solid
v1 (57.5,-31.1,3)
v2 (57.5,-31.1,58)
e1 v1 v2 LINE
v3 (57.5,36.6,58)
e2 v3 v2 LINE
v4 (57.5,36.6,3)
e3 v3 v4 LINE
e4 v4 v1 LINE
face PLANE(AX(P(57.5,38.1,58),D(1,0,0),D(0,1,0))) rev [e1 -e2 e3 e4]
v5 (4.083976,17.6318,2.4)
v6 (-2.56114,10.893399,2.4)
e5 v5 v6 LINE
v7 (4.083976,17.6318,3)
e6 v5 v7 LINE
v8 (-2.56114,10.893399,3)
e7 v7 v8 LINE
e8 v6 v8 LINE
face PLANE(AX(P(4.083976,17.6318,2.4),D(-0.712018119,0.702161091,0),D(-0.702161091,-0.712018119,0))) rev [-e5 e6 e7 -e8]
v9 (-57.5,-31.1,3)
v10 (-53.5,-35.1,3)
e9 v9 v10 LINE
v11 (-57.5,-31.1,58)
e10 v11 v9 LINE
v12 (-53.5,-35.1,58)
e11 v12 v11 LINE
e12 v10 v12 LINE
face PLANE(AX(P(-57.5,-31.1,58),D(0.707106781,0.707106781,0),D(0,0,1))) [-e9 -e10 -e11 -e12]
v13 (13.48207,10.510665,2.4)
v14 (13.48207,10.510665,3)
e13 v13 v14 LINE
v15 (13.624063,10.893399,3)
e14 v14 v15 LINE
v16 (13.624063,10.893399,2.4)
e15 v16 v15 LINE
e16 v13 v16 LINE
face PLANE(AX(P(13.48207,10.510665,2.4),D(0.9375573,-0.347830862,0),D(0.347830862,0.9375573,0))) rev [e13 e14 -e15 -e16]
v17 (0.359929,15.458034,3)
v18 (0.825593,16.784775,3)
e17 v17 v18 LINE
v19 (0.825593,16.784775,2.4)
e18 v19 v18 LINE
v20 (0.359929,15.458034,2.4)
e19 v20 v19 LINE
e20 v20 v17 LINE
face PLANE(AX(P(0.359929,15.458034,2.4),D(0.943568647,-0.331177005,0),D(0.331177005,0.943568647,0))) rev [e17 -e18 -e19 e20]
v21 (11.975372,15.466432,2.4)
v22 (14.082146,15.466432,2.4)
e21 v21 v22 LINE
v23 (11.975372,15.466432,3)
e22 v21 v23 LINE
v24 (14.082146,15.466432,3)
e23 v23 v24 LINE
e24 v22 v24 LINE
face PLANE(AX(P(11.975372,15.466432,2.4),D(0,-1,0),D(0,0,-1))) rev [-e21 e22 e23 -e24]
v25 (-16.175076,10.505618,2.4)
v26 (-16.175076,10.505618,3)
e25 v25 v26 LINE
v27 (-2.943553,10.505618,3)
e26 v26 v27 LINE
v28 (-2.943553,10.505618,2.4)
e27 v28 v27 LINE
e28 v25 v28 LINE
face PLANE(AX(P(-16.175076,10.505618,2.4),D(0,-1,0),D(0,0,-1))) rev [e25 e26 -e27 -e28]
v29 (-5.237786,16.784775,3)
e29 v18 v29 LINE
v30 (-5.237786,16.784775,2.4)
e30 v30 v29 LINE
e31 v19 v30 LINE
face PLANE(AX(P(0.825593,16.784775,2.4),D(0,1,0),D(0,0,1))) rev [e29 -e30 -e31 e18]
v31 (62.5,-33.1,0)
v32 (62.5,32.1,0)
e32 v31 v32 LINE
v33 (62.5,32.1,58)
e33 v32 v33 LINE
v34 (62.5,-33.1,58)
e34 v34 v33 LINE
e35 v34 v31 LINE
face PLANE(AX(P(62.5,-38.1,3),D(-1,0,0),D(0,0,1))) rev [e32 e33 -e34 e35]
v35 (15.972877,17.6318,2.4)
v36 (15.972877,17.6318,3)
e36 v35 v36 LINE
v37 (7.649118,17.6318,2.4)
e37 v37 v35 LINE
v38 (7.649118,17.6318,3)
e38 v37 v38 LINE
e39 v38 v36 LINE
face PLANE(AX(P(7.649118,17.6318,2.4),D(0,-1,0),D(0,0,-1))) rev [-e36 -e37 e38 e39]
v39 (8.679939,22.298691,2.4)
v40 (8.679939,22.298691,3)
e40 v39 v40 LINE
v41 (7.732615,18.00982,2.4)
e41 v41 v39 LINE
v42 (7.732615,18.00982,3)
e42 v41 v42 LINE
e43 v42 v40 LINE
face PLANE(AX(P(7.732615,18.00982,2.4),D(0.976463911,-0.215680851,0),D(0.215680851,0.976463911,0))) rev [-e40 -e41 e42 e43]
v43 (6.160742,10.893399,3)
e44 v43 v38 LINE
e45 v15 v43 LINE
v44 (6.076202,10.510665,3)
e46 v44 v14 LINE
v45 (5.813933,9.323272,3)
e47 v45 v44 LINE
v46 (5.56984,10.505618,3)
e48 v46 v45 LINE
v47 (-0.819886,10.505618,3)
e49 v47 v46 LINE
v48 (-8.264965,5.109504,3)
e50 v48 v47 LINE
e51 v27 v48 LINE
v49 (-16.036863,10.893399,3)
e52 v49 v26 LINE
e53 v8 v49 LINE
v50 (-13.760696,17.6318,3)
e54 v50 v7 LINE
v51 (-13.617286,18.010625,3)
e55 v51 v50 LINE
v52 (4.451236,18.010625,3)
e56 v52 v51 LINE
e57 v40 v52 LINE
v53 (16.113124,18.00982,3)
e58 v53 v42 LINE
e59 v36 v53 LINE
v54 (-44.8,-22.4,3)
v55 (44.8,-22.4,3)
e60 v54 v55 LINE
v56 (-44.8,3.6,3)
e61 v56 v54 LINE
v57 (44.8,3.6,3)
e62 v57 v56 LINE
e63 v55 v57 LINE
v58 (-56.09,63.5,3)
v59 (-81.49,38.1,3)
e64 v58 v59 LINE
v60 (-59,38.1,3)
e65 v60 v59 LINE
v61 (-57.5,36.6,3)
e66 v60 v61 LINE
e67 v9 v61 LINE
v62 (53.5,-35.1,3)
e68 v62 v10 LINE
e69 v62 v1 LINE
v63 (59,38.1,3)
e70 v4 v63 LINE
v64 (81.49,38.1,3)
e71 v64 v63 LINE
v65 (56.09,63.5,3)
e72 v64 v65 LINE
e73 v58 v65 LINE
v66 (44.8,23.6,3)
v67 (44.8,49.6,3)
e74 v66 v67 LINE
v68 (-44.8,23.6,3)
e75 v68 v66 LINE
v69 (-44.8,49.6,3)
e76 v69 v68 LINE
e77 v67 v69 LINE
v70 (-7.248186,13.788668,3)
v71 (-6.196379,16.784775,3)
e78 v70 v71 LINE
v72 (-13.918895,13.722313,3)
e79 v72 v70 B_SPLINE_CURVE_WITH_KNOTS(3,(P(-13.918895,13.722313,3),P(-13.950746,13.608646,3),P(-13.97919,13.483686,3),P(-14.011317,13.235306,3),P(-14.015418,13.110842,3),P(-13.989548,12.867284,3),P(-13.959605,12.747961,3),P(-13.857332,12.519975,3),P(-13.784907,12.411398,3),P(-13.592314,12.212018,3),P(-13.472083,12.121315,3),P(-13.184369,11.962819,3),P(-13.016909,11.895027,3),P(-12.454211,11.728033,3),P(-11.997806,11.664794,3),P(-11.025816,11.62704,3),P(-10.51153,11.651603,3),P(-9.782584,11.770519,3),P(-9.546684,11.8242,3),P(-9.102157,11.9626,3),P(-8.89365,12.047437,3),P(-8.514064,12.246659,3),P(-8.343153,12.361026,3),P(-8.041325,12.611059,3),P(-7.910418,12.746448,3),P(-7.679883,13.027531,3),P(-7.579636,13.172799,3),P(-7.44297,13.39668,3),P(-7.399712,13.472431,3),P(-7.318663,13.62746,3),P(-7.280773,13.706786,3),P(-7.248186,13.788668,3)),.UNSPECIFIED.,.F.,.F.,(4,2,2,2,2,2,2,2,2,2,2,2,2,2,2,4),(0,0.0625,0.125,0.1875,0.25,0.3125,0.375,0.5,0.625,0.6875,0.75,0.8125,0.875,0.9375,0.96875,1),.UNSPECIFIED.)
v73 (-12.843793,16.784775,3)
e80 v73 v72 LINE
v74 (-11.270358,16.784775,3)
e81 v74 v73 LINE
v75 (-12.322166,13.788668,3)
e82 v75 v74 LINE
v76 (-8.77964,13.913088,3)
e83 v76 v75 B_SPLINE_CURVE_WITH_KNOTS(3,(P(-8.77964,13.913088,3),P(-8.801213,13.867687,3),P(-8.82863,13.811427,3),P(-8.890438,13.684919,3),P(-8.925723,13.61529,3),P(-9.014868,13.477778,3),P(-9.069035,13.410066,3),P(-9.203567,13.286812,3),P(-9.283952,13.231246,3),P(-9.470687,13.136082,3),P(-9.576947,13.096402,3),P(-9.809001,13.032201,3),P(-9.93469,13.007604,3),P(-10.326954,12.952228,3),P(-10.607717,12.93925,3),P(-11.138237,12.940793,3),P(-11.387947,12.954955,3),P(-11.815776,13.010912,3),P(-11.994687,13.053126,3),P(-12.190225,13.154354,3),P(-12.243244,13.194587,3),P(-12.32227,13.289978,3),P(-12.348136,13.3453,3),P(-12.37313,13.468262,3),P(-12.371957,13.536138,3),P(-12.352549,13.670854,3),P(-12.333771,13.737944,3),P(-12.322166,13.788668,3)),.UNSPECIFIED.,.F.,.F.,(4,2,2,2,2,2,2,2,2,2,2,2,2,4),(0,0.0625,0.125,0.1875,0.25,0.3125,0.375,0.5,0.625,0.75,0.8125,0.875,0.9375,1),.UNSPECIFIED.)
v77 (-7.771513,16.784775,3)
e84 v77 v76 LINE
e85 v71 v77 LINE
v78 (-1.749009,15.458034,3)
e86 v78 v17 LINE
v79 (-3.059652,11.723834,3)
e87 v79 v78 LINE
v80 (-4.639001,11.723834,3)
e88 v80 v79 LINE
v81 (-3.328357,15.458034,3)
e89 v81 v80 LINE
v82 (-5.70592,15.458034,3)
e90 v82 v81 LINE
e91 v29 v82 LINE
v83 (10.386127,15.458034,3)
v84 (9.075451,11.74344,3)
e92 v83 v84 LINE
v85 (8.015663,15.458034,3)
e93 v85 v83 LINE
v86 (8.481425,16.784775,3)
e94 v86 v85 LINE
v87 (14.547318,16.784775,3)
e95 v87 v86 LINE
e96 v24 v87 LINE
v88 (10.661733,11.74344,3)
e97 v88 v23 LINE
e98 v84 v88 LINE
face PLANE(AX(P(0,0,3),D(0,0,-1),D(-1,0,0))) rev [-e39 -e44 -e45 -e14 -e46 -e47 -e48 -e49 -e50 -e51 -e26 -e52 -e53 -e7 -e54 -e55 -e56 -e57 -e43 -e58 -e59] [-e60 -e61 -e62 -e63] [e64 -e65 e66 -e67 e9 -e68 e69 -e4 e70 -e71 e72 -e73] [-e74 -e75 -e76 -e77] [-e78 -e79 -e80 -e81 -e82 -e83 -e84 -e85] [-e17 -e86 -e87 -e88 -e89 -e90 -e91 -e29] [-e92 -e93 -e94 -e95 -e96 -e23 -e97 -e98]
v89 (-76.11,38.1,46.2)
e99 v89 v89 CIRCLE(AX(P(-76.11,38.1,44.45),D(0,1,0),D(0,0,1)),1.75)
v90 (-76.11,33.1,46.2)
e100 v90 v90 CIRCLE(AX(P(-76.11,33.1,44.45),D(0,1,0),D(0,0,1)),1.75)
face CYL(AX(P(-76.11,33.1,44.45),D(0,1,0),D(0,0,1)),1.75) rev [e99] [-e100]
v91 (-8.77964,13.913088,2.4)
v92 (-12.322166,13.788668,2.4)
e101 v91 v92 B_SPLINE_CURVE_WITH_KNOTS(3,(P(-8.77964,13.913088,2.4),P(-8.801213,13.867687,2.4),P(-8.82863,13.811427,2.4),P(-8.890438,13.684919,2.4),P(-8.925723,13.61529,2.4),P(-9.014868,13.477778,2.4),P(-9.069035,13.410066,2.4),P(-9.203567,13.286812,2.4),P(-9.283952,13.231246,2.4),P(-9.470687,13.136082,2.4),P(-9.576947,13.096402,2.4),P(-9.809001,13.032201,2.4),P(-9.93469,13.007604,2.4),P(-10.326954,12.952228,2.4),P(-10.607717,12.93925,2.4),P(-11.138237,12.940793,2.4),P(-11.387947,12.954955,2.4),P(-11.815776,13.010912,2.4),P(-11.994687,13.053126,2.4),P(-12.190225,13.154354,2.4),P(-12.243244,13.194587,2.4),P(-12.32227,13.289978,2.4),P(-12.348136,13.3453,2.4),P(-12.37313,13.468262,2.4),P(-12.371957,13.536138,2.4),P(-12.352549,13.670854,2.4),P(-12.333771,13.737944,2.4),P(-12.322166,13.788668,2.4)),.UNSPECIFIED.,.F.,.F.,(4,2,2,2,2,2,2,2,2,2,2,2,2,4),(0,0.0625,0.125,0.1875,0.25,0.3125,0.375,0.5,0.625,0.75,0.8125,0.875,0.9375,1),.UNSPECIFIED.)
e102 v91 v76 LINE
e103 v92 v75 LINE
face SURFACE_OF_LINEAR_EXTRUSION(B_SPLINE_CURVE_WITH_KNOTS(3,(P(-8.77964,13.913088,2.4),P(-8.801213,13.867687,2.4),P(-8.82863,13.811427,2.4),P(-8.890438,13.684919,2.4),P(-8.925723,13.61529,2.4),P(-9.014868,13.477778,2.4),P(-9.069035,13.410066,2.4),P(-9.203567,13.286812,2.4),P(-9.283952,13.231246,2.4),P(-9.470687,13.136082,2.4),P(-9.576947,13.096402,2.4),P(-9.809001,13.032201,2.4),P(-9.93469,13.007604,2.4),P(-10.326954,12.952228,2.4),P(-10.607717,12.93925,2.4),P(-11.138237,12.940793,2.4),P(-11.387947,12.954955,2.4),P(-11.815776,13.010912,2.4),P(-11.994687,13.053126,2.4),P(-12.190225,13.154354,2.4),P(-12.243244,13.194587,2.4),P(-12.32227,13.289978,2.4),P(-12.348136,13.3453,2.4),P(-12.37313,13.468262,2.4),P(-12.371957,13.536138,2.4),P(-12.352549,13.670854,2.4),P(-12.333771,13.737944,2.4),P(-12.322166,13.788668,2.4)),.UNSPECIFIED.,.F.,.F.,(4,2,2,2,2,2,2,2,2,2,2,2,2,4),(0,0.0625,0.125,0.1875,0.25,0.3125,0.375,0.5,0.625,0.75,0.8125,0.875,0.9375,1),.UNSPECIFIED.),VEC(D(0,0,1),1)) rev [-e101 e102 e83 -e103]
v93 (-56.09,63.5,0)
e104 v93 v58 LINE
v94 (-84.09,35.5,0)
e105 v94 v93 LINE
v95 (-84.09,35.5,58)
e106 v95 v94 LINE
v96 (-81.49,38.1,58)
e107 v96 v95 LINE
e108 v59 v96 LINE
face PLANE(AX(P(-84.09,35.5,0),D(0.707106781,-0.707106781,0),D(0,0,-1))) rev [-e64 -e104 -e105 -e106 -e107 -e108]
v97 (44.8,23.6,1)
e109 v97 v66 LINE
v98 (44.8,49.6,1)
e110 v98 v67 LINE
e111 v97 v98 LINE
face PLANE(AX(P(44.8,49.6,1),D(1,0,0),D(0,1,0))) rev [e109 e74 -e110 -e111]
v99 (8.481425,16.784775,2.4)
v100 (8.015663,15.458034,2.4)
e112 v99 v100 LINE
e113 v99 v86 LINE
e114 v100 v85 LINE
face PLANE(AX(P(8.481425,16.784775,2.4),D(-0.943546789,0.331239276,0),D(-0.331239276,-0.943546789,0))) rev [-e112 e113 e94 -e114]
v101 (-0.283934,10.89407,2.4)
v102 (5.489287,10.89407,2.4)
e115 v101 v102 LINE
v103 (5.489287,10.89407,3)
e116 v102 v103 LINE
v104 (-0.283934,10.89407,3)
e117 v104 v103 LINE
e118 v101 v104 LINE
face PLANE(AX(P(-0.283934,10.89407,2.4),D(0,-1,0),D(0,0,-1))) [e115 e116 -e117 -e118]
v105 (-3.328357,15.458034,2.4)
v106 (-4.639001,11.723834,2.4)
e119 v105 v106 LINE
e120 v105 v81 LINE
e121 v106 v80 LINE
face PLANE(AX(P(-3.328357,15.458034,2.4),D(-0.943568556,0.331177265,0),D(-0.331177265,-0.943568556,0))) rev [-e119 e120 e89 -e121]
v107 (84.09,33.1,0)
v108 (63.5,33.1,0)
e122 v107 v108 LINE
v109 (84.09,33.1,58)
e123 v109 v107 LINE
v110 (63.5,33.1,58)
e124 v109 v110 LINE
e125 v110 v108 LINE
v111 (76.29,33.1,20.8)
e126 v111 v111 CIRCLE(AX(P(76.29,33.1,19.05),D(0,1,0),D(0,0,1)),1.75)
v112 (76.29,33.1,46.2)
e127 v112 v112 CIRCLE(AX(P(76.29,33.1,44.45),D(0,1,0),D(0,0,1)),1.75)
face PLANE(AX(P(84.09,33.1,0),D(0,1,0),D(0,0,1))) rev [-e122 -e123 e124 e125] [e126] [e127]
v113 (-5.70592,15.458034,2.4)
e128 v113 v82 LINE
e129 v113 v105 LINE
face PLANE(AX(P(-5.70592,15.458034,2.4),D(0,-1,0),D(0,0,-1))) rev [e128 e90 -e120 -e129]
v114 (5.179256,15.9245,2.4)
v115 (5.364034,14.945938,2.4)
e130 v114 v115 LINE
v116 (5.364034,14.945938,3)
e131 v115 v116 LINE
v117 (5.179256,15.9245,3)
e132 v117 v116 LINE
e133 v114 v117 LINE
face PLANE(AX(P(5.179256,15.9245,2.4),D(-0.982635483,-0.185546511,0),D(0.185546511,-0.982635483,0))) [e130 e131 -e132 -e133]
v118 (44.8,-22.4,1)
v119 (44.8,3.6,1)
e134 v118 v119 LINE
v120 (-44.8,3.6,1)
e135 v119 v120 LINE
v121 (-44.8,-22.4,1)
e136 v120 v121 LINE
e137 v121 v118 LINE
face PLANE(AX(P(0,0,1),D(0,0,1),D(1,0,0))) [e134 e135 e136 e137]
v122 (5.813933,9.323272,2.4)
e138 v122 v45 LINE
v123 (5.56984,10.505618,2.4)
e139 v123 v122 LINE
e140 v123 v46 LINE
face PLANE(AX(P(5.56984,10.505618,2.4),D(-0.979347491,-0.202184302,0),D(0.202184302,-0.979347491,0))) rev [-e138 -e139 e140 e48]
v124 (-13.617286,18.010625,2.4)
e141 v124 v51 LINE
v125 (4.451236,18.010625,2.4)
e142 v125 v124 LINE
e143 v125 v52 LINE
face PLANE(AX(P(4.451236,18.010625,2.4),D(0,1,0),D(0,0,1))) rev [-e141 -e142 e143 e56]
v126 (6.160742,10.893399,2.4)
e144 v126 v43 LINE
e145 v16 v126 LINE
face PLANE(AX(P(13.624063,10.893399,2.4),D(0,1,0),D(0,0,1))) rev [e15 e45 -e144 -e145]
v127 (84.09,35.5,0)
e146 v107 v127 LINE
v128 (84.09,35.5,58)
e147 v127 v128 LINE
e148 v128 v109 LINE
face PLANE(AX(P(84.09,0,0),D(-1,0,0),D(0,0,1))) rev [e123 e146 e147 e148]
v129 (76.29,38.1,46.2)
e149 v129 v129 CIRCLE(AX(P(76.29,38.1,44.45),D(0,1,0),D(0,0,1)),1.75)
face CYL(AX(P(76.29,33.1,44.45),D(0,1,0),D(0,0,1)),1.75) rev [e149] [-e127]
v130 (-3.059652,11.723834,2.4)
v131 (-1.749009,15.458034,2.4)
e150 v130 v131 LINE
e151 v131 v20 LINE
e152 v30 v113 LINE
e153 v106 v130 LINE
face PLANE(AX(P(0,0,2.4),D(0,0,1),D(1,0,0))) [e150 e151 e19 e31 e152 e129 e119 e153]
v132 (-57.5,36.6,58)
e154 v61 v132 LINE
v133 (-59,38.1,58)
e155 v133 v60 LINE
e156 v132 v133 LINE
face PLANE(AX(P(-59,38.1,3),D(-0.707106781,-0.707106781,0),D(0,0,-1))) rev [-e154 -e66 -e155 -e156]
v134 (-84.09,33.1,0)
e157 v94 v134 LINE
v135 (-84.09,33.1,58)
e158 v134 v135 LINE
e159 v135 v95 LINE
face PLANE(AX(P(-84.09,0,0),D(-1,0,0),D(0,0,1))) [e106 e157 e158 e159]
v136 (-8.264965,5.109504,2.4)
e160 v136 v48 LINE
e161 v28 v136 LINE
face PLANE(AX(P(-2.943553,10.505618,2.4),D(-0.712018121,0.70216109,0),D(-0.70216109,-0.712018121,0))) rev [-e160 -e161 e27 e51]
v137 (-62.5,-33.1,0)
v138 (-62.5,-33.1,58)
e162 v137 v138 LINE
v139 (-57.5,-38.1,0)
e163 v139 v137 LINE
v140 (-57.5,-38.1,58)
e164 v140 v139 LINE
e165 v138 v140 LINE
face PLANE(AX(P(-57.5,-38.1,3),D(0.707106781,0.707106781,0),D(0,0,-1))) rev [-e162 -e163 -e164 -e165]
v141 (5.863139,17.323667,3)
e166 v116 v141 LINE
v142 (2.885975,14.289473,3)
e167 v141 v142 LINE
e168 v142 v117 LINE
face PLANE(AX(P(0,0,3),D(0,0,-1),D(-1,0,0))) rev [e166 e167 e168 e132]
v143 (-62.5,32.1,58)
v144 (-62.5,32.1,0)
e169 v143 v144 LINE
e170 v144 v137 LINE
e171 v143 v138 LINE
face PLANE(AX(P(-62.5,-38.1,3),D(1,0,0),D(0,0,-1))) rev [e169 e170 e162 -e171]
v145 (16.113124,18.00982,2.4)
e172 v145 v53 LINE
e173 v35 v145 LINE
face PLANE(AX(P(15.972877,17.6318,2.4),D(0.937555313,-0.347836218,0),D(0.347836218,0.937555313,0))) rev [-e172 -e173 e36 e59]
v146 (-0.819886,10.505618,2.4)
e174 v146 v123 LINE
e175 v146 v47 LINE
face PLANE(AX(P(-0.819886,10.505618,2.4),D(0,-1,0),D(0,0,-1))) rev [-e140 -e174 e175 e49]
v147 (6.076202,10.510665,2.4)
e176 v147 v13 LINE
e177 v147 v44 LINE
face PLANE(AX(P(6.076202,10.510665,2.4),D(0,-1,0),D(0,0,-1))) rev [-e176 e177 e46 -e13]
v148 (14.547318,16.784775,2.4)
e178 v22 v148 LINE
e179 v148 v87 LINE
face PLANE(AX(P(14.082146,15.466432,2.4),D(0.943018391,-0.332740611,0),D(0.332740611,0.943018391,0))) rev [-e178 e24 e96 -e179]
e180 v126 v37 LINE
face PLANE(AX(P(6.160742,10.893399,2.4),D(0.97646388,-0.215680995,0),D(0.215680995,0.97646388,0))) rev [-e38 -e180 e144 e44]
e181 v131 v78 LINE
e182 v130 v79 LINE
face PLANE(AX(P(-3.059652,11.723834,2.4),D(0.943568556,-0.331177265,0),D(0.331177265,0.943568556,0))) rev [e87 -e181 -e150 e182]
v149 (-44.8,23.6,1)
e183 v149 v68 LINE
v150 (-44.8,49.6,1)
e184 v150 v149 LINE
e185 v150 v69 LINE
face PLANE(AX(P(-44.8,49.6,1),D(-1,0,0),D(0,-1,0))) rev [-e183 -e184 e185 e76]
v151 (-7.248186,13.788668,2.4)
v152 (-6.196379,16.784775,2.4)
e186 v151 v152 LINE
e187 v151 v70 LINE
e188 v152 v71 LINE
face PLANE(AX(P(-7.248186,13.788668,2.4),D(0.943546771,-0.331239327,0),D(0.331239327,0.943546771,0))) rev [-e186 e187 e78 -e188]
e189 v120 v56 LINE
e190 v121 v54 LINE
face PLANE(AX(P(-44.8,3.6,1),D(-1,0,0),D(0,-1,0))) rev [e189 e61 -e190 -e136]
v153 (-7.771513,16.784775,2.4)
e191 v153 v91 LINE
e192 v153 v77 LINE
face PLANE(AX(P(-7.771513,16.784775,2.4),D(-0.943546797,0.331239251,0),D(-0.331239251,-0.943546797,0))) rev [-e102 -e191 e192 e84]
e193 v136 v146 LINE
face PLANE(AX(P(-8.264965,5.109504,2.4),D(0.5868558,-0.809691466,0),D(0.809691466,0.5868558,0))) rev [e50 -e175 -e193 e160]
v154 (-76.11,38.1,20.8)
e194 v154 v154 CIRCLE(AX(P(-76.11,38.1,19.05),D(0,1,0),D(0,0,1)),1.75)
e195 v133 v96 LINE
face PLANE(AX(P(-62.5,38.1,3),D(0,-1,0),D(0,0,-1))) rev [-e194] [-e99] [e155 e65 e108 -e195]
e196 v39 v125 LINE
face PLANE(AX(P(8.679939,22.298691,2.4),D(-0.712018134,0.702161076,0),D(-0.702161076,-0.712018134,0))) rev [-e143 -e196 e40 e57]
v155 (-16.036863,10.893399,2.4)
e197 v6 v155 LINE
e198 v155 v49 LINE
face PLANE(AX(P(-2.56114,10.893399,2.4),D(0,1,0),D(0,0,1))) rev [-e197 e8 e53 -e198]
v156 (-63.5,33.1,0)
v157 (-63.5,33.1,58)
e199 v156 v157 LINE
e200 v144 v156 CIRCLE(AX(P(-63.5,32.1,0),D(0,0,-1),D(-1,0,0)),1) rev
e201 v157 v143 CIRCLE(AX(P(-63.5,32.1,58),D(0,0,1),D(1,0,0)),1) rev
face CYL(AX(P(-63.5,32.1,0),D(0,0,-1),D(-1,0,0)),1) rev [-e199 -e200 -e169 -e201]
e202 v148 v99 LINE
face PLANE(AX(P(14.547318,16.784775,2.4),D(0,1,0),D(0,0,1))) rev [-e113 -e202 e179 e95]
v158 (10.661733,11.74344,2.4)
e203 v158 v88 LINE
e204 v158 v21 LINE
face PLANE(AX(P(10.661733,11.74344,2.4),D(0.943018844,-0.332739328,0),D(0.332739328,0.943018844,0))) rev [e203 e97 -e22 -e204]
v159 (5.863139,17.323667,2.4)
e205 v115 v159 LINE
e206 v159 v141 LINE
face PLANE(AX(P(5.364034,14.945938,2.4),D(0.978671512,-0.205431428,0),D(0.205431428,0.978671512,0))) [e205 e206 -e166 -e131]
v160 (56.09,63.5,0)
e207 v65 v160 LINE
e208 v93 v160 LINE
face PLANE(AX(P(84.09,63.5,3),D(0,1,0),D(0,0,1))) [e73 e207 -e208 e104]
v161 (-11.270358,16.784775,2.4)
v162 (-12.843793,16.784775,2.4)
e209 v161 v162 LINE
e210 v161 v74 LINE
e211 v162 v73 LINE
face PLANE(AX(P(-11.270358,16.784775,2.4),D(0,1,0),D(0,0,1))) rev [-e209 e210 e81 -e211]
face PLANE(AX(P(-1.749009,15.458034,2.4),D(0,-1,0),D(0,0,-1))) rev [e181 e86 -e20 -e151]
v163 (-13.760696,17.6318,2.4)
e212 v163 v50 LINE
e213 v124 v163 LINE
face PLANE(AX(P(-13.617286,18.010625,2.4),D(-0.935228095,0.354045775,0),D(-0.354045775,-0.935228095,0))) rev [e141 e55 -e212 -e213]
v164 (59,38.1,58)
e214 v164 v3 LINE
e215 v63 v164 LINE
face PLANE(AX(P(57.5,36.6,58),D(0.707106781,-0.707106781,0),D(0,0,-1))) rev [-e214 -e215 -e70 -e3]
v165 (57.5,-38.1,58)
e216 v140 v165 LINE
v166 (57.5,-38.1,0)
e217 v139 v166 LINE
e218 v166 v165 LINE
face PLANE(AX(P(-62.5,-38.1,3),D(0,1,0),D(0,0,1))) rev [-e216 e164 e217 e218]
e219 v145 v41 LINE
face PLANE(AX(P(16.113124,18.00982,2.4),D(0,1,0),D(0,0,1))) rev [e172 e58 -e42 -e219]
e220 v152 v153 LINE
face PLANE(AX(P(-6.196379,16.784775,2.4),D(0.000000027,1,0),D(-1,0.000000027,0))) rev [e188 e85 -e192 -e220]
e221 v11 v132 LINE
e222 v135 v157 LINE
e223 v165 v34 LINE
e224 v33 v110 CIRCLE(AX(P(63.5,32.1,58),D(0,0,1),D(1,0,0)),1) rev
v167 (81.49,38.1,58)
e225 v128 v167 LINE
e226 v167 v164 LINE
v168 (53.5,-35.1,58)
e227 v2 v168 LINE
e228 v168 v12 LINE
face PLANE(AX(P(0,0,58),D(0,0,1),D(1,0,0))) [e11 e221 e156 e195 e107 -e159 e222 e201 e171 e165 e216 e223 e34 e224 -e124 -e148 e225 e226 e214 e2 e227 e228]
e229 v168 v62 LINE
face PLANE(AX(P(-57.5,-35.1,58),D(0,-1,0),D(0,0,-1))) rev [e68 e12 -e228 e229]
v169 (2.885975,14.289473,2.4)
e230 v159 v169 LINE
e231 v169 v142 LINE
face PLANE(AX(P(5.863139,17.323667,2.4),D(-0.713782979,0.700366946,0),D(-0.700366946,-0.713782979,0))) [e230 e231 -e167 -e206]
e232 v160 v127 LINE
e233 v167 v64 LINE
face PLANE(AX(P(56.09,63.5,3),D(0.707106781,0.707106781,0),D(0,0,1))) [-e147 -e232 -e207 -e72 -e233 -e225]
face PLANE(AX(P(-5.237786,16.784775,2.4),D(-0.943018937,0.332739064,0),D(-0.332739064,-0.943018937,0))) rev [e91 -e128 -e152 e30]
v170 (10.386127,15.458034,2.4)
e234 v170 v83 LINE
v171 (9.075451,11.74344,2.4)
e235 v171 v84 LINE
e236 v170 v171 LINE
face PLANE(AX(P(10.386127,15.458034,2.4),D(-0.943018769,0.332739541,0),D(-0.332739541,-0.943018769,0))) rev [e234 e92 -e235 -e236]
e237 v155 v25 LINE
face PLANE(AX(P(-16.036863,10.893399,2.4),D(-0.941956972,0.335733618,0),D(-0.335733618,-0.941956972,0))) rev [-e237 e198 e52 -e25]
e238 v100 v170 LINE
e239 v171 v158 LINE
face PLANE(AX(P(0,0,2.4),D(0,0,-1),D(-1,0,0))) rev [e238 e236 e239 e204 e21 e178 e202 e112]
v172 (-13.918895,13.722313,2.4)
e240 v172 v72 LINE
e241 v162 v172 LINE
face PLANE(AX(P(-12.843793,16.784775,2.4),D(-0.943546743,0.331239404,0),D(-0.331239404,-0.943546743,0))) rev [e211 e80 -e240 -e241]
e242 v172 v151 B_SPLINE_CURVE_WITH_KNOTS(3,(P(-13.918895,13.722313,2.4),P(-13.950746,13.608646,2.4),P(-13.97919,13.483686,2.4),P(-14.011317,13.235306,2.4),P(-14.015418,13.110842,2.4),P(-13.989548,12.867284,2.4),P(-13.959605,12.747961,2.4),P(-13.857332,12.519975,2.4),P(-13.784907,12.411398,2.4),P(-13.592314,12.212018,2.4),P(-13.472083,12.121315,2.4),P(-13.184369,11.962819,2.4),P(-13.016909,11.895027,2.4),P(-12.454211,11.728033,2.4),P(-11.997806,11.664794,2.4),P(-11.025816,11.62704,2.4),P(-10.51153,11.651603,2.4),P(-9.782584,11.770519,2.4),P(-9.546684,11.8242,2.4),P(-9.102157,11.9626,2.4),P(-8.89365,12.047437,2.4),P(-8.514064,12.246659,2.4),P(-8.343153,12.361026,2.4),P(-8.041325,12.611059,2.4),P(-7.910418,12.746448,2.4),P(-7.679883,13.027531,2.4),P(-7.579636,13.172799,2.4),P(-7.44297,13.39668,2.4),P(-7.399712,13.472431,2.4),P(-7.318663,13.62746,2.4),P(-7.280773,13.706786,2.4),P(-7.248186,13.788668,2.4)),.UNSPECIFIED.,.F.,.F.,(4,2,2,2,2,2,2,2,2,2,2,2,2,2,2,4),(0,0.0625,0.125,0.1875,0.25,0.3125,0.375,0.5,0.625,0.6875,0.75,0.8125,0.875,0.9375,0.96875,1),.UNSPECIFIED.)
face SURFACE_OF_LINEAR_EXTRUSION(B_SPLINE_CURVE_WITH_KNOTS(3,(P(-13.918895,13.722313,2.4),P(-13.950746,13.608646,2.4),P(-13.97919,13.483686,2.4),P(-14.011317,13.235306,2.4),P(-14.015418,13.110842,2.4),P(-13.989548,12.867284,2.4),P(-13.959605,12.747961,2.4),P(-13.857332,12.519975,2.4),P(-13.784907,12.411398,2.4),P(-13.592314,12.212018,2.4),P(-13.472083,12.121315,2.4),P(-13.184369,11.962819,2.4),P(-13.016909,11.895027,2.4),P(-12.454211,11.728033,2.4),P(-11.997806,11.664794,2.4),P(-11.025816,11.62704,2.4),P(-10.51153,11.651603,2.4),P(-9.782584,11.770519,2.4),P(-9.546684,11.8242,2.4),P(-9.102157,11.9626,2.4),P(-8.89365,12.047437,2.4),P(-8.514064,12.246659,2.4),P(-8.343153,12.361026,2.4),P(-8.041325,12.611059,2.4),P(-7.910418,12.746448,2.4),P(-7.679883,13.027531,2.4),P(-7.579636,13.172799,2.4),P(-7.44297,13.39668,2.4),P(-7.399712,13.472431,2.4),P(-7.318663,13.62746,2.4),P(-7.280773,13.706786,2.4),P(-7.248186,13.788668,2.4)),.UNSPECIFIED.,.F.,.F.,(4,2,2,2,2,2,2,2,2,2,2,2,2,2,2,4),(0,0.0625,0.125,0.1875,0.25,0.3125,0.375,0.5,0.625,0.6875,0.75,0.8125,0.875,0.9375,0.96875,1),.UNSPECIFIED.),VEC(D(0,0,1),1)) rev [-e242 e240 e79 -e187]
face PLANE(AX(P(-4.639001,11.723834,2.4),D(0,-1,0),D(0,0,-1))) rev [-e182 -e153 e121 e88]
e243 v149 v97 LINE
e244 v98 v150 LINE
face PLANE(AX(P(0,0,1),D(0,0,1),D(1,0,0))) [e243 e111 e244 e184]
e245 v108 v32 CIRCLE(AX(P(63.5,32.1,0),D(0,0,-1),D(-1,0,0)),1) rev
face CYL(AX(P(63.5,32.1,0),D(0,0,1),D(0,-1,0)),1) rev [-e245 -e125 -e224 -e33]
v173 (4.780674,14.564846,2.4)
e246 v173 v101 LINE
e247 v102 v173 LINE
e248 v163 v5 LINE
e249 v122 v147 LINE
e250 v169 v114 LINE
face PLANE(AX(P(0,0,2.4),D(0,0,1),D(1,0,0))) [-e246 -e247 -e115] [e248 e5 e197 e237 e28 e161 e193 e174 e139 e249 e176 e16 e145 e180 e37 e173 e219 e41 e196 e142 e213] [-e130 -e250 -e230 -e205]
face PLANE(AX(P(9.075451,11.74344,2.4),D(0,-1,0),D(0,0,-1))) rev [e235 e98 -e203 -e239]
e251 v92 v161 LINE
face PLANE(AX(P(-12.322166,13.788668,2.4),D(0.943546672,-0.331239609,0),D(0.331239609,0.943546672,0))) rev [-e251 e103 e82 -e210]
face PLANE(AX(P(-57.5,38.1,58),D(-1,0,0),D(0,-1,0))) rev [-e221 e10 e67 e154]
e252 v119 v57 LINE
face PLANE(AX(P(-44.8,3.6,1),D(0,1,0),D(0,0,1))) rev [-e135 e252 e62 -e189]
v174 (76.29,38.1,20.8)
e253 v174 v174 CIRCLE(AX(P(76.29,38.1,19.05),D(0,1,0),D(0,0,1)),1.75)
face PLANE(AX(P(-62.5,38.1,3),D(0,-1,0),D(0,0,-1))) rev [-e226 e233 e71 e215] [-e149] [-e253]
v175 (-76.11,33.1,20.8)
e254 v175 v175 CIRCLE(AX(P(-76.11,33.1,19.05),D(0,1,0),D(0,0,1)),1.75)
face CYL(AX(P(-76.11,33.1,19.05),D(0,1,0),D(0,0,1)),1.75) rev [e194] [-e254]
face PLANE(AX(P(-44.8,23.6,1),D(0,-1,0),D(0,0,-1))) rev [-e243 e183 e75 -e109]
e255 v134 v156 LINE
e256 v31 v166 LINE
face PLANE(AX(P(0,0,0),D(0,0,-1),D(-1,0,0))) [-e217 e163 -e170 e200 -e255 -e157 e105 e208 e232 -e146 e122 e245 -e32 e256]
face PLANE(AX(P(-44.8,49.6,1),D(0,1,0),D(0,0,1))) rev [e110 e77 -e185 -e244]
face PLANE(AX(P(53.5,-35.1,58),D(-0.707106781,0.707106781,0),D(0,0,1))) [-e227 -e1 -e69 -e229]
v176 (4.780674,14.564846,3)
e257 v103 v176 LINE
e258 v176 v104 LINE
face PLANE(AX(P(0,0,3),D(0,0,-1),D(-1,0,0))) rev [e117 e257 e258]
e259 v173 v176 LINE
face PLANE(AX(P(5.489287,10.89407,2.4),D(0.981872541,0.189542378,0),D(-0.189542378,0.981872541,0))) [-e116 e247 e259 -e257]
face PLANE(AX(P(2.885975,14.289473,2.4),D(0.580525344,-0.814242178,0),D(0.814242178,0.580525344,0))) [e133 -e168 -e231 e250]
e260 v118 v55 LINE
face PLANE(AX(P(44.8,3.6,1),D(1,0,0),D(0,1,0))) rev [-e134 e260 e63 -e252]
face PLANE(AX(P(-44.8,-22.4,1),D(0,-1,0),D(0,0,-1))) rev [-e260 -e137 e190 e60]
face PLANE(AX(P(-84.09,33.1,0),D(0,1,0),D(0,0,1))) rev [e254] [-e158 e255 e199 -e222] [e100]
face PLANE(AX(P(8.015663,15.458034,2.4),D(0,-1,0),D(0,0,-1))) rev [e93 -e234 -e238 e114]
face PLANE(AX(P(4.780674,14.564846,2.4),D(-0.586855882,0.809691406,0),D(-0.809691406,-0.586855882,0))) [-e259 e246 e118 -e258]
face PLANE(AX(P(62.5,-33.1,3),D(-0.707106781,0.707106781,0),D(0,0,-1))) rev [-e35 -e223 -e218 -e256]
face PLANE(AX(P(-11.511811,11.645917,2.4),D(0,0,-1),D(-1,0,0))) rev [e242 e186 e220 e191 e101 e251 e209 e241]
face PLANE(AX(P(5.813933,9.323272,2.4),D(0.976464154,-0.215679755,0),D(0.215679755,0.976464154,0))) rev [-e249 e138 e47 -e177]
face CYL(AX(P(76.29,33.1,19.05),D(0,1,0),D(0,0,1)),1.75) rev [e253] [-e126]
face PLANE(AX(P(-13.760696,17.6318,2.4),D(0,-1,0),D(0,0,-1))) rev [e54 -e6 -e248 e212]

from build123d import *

# Parameters (mm, degrees)
SKETCH1_W           = 125
SKETCH1_H           = 76.2
BOSS_EXTRUDE1_DEPTH = 3
SKETCH2_W           = 5
SKETCH2_H           = 76.2
BOSS_EXTRUDE2_DEPTH = 55
SKETCH4_W           = 58
SKETCH4_H           = 5
BOSS_EXTRUDE4_DEPTH = 21.59
SKETCH5_W           = 58
SKETCH5_H           = 5
BOSS_EXTRUDE5_DEPTH = 21.59
SKETCH6_W           = 168.18
SKETCH6_H           = 25.4
BOSS_EXTRUDE6_DEPTH = 3
CHAMFER1_SIZE       = 28
SKETCH7_W           = 89.6
SKETCH7_H           = 26
CUT_EXTRUDE1_DEPTH  = 2
SKETCH9_W           = 115
SKETCH9_H           = 3
BOSS_EXTRUDE7_DEPTH = 55
CHAMFER2_SIZE       = 4
CHAMFER3_SIZE       = 5
CUT_EXTRUDE2_START  = -0.6
CUT_EXTRUDE2_DEPTH  = 0.6
SKETCH11_R          = 1.75
CUT_EXTRUDE3_DEPTH  = 5
SKETCH12_R          = 1.75
CUT_EXTRUDE4_DEPTH  = 5
FILLET1_R           = 1
CHAMFER4_SIZE       = 1.5


# Read off the part's stored shape, not the designer's step: Cut-Extrude2
with BuildPart() as part:
    # Sketch1 → Boss-Extrude1 (new body)
    with BuildSketch(Plane.XY):
        Rectangle(SKETCH1_W, SKETCH1_H)
    extrude(amount=BOSS_EXTRUDE1_DEPTH)

    # Sketch2 → Boss-Extrude2 (add)
    with BuildSketch(Plane.XY.offset(3)):
        with Locations((-60, 0)):
            Rectangle(SKETCH2_W, SKETCH2_H)
        with Locations((60, 0)):
            Rectangle(SKETCH2_W, SKETCH2_H)
    extrude(amount=BOSS_EXTRUDE2_DEPTH)

    # Sketch4 → Boss-Extrude4 (add)
    with BuildSketch(Plane.ZY.offset(62.5)):
        with Locations((29, 35.6)):
            Rectangle(SKETCH4_W, SKETCH4_H)
    extrude(amount=BOSS_EXTRUDE4_DEPTH)

    # Sketch5 → Boss-Extrude5 (add)
    with BuildSketch(Plane(origin=(62.5, 0, 0), x_dir=(0, 0, -1), z_dir=(1, 0, 0))):
        with Locations((-29, 35.6)):
            Rectangle(SKETCH5_W, SKETCH5_H)
    extrude(amount=BOSS_EXTRUDE5_DEPTH)

    # Sketch6 → Boss-Extrude6 (add)
    with BuildSketch(Plane(origin=(0, 0, 0), x_dir=(-1, 0, 0), z_dir=(0, 0, -1))):
        with Locations((0, 50.8)):
            Rectangle(SKETCH6_W, SKETCH6_H)
    extrude(amount=-BOSS_EXTRUDE6_DEPTH)

    # Chamfer1
    chamfer1_edges = [part.edges().sort_by_distance(p)[0] for p in [
        (-84.09, 63.5, 1.5),
        (84.09, 63.5, 1.5),
    ]]
    chamfer(chamfer1_edges, length=CHAMFER1_SIZE)

    # Sketch7 → Cut-Extrude1 (cut)
    with BuildSketch(Plane.XY.offset(3)):
        with Locations((0, -9.4)):
            Rectangle(SKETCH7_W, SKETCH7_H)
        with Locations((0, 36.6)):
            Rectangle(SKETCH7_W, SKETCH7_H)
    extrude(amount=-CUT_EXTRUDE1_DEPTH, mode=Mode.SUBTRACT)

    # Sketch9 → Boss-Extrude7 (add)
    with BuildSketch(Plane.XY.offset(3)):
        with Locations((0, -36.6)):
            Rectangle(SKETCH9_W, SKETCH9_H)
    extrude(amount=BOSS_EXTRUDE7_DEPTH)

    # Chamfer2
    chamfer2_edges = [part.edges().sort_by_distance(p)[0] for p in [
        (-57.5, -35.1, 30.5),
        (57.5, -35.1, 30.5),
    ]]
    chamfer(chamfer2_edges, length=CHAMFER2_SIZE)

    # Chamfer3
    chamfer3_edges = [part.edges().sort_by_distance(p)[0] for p in [
        (62.5, -38.1, 29),
        (-62.5, -38.1, 29),
    ]]
    chamfer(chamfer3_edges, length=CHAMFER3_SIZE)

    # Cut-Extrude2 outline → Cut-Extrude2 (cut)
    # profile 1 of 4: a face of its own
    with BuildSketch(Plane.XY.offset(3).offset(CUT_EXTRUDE2_START)):
        with BuildLine():
            Line((-12.843793417, 16.784775128), (-13.918894641, 13.722312614))
            add(Edge.make_bspline(
                [(-13.918894641, 13.722312614), (-13.950745906, 13.608646354), (-13.97919001, 13.483685694), (-14.011317489, 13.235305925), (-14.01541758, 13.110841548), (-13.989547543, 12.867284383), (-13.959604678, 12.747961158), (-13.857332343, 12.519974586), (-13.78490702, 12.411398187), (-13.592313629, 12.212018271), (-13.472083062, 12.121314997), (-13.184369222, 11.962818623), (-13.016909084, 11.895027419), (-12.454211206, 11.728033285), (-11.997806272, 11.664794493), (-11.025815686, 11.62704002), (-10.511530183, 11.651603075), (-9.78258436, 11.770518687), (-9.546683753, 11.824200176), (-9.102156978, 11.962599668), (-8.89364967, 12.047436893), (-8.514064046, 12.246658938), (-8.343153207, 12.361026326), (-8.04132547, 12.611058926), (-7.910418089, 12.746448479), (-7.679883041, 13.0275306), (-7.579636344, 13.172799488), (-7.44297026, 13.39668043), (-7.39971151, 13.472431032), (-7.318663078, 13.627460279), (-7.280772846, 13.706786212), (-7.248185858, 13.788667895)],
                knots=[0, 0, 0, 0, 0.0625, 0.0625, 0.125, 0.125, 0.1875, 0.1875, 0.25, 0.25, 0.3125, 0.3125, 0.375, 0.375, 0.5, 0.5, 0.625, 0.625, 0.6875, 0.6875, 0.75, 0.75, 0.8125, 0.8125, 0.875, 0.875, 0.9375, 0.9375, 0.96875, 0.96875, 1, 1, 1, 1], degree=3))
            Line((-7.248185858, 13.788667895), (-6.196379448, 16.784775128))
            Line((-6.196379448, 16.784775128), (-7.771512854, 16.784775171))
            Line((-7.771512854, 16.784775171), (-8.779640442, 13.913087848))
            add(Edge.make_bspline(
                [(-8.779640442, 13.913087848), (-8.801212863, 13.867686768), (-8.828630281, 13.811426743), (-8.890437912, 13.684919137), (-8.925723343, 13.615289873), (-9.014867696, 13.477778317), (-9.069034752, 13.410065742), (-9.20356673, 13.286811644), (-9.283951715, 13.231246188), (-9.470687062, 13.136081945), (-9.576947425, 13.096402347), (-9.809000897, 13.032201026), (-9.934689567, 13.00760449), (-10.326953956, 12.952228061), (-10.607716868, 12.939250309), (-11.138236784, 12.940792557), (-11.387946526, 12.95495502), (-11.815776289, 13.010911905), (-11.994686961, 13.05312605), (-12.19022456, 13.154353945), (-12.243244201, 13.194586759), (-12.322270156, 13.289978248), (-12.348136332, 13.345299657), (-12.373130151, 13.46826163), (-12.371956966, 13.5361378), (-12.35254935, 13.67085438), (-12.333771283, 13.737944141), (-12.322165603, 13.788667937)],
                knots=[0, 0, 0, 0, 0.0625, 0.0625, 0.125, 0.125, 0.1875, 0.1875, 0.25, 0.25, 0.3125, 0.3125, 0.375, 0.375, 0.5, 0.5, 0.625, 0.625, 0.75, 0.75, 0.8125, 0.8125, 0.875, 0.875, 0.9375, 0.9375, 1, 1, 1, 1], degree=3))
            Line((-12.322165603, 13.788667937), (-11.2703582, 16.784775128))
            Line((-11.2703582, 16.784775128), (-12.843793417, 16.784775128))
        make_face()
    # profile 2 of 4: a face of its own
    with BuildSketch(Plane.XY.offset(3).offset(CUT_EXTRUDE2_START)):
        Polygon((14.082145905, 15.466432145), (14.547318434, 16.784775128), (8.481425261, 16.784775128), (8.015662645, 15.45803385), (10.386127447, 15.45803385), (9.075451111, 11.743439605), (10.661733364, 11.743439605), (11.975372051, 15.466432145), align=None)
    # profile 3 of 4: a face of its own
    with BuildSketch(Plane.XY.offset(3).offset(CUT_EXTRUDE2_START)):
        Polygon((0.359928822, 15.45803385), (0.825593089, 16.784775128), (-5.237786258, 16.784775128), (-5.705919648, 15.45803385), (-3.328357423, 15.45803385), (-4.639000977, 11.723834147), (-3.059652234, 11.723834147), (-1.74900868, 15.45803385), align=None)
    # profile 4 of 4: a face of its own
    with BuildSketch(Plane.XY.offset(3).offset(CUT_EXTRUDE2_START)):
        Polygon((7.732615088, 18.009820452), (8.67993853, 22.298690548), (4.451236342, 18.010625114), (-13.617285872, 18.010625114), (-13.760696138, 17.631800344), (4.083976363, 17.631800344), (-2.561139847, 10.89339914), (-16.036862666, 10.89339914), (-16.175076152, 10.505618026), (-2.943552817, 10.505618026), (-8.264964605, 5.10950355), (-0.819885517, 10.505618026), (5.569839691, 10.505618026), (5.813932632, 9.32327198), (6.07620201, 10.510665049), (13.482070183, 10.510665049), (13.624063348, 10.89339914), (6.160742258, 10.89339914), (7.649117922, 17.631800344), (15.972876762, 17.631800344), (16.113123511, 18.009820452), align=None)
        Polygon((-0.283933962, 10.894070437), (4.780674194, 14.564845582), (5.489286994, 10.894070437), align=None, mode=Mode.SUBTRACT)
        Polygon((5.863139247, 17.323666682), (5.364033793, 14.945937564), (5.179256414, 15.9244998), (2.885975157, 14.289472868), align=None, mode=Mode.SUBTRACT)
    extrude(amount=CUT_EXTRUDE2_DEPTH, mode=Mode.SUBTRACT)

    # Sketch11 → Cut-Extrude3 (cut)
    with BuildSketch(Plane(origin=(0, 38.1, 0), x_dir=(1, 0, 0), z_dir=(0, 1, 0))):
        with Locations(Location((-76.11, -19.05, 0), (0, 0, 270))):
            Circle(SKETCH11_R)
        with Locations(Location((76.29, -19.05, 0), (0, 0, 270))):
            Circle(SKETCH11_R)
    extrude(amount=-CUT_EXTRUDE3_DEPTH, mode=Mode.SUBTRACT)

    # Sketch12 → Cut-Extrude4 (cut)
    with BuildSketch(Plane(origin=(0, 38.1, 0), x_dir=(1, 0, 0), z_dir=(0, 1, 0))):
        with Locations(Location((-76.11, -44.45, 0), (0, 0, 270))):
            Circle(SKETCH12_R)
        with Locations(Location((76.29, -44.45, 0), (0, 0, 270))):
            Circle(SKETCH12_R)
    extrude(amount=-CUT_EXTRUDE4_DEPTH, mode=Mode.SUBTRACT)

    # Fillet1
    fillet1_edges = [part.edges().sort_by_distance(p)[0] for p in [
        (-62.5, 33.1, 29),
        (62.5, 33.1, 29),
    ]]
    fillet(fillet1_edges, radius=FILLET1_R)

    # Chamfer4
    chamfer4_edges = [part.edges().sort_by_distance(p)[0] for p in [
        (-57.5, 38.1, 30.5),
        (57.5, 38.1, 30.5),
    ]]
    chamfer(chamfer4_edges, length=CHAMFER4_SIZE)


solid = part.part
